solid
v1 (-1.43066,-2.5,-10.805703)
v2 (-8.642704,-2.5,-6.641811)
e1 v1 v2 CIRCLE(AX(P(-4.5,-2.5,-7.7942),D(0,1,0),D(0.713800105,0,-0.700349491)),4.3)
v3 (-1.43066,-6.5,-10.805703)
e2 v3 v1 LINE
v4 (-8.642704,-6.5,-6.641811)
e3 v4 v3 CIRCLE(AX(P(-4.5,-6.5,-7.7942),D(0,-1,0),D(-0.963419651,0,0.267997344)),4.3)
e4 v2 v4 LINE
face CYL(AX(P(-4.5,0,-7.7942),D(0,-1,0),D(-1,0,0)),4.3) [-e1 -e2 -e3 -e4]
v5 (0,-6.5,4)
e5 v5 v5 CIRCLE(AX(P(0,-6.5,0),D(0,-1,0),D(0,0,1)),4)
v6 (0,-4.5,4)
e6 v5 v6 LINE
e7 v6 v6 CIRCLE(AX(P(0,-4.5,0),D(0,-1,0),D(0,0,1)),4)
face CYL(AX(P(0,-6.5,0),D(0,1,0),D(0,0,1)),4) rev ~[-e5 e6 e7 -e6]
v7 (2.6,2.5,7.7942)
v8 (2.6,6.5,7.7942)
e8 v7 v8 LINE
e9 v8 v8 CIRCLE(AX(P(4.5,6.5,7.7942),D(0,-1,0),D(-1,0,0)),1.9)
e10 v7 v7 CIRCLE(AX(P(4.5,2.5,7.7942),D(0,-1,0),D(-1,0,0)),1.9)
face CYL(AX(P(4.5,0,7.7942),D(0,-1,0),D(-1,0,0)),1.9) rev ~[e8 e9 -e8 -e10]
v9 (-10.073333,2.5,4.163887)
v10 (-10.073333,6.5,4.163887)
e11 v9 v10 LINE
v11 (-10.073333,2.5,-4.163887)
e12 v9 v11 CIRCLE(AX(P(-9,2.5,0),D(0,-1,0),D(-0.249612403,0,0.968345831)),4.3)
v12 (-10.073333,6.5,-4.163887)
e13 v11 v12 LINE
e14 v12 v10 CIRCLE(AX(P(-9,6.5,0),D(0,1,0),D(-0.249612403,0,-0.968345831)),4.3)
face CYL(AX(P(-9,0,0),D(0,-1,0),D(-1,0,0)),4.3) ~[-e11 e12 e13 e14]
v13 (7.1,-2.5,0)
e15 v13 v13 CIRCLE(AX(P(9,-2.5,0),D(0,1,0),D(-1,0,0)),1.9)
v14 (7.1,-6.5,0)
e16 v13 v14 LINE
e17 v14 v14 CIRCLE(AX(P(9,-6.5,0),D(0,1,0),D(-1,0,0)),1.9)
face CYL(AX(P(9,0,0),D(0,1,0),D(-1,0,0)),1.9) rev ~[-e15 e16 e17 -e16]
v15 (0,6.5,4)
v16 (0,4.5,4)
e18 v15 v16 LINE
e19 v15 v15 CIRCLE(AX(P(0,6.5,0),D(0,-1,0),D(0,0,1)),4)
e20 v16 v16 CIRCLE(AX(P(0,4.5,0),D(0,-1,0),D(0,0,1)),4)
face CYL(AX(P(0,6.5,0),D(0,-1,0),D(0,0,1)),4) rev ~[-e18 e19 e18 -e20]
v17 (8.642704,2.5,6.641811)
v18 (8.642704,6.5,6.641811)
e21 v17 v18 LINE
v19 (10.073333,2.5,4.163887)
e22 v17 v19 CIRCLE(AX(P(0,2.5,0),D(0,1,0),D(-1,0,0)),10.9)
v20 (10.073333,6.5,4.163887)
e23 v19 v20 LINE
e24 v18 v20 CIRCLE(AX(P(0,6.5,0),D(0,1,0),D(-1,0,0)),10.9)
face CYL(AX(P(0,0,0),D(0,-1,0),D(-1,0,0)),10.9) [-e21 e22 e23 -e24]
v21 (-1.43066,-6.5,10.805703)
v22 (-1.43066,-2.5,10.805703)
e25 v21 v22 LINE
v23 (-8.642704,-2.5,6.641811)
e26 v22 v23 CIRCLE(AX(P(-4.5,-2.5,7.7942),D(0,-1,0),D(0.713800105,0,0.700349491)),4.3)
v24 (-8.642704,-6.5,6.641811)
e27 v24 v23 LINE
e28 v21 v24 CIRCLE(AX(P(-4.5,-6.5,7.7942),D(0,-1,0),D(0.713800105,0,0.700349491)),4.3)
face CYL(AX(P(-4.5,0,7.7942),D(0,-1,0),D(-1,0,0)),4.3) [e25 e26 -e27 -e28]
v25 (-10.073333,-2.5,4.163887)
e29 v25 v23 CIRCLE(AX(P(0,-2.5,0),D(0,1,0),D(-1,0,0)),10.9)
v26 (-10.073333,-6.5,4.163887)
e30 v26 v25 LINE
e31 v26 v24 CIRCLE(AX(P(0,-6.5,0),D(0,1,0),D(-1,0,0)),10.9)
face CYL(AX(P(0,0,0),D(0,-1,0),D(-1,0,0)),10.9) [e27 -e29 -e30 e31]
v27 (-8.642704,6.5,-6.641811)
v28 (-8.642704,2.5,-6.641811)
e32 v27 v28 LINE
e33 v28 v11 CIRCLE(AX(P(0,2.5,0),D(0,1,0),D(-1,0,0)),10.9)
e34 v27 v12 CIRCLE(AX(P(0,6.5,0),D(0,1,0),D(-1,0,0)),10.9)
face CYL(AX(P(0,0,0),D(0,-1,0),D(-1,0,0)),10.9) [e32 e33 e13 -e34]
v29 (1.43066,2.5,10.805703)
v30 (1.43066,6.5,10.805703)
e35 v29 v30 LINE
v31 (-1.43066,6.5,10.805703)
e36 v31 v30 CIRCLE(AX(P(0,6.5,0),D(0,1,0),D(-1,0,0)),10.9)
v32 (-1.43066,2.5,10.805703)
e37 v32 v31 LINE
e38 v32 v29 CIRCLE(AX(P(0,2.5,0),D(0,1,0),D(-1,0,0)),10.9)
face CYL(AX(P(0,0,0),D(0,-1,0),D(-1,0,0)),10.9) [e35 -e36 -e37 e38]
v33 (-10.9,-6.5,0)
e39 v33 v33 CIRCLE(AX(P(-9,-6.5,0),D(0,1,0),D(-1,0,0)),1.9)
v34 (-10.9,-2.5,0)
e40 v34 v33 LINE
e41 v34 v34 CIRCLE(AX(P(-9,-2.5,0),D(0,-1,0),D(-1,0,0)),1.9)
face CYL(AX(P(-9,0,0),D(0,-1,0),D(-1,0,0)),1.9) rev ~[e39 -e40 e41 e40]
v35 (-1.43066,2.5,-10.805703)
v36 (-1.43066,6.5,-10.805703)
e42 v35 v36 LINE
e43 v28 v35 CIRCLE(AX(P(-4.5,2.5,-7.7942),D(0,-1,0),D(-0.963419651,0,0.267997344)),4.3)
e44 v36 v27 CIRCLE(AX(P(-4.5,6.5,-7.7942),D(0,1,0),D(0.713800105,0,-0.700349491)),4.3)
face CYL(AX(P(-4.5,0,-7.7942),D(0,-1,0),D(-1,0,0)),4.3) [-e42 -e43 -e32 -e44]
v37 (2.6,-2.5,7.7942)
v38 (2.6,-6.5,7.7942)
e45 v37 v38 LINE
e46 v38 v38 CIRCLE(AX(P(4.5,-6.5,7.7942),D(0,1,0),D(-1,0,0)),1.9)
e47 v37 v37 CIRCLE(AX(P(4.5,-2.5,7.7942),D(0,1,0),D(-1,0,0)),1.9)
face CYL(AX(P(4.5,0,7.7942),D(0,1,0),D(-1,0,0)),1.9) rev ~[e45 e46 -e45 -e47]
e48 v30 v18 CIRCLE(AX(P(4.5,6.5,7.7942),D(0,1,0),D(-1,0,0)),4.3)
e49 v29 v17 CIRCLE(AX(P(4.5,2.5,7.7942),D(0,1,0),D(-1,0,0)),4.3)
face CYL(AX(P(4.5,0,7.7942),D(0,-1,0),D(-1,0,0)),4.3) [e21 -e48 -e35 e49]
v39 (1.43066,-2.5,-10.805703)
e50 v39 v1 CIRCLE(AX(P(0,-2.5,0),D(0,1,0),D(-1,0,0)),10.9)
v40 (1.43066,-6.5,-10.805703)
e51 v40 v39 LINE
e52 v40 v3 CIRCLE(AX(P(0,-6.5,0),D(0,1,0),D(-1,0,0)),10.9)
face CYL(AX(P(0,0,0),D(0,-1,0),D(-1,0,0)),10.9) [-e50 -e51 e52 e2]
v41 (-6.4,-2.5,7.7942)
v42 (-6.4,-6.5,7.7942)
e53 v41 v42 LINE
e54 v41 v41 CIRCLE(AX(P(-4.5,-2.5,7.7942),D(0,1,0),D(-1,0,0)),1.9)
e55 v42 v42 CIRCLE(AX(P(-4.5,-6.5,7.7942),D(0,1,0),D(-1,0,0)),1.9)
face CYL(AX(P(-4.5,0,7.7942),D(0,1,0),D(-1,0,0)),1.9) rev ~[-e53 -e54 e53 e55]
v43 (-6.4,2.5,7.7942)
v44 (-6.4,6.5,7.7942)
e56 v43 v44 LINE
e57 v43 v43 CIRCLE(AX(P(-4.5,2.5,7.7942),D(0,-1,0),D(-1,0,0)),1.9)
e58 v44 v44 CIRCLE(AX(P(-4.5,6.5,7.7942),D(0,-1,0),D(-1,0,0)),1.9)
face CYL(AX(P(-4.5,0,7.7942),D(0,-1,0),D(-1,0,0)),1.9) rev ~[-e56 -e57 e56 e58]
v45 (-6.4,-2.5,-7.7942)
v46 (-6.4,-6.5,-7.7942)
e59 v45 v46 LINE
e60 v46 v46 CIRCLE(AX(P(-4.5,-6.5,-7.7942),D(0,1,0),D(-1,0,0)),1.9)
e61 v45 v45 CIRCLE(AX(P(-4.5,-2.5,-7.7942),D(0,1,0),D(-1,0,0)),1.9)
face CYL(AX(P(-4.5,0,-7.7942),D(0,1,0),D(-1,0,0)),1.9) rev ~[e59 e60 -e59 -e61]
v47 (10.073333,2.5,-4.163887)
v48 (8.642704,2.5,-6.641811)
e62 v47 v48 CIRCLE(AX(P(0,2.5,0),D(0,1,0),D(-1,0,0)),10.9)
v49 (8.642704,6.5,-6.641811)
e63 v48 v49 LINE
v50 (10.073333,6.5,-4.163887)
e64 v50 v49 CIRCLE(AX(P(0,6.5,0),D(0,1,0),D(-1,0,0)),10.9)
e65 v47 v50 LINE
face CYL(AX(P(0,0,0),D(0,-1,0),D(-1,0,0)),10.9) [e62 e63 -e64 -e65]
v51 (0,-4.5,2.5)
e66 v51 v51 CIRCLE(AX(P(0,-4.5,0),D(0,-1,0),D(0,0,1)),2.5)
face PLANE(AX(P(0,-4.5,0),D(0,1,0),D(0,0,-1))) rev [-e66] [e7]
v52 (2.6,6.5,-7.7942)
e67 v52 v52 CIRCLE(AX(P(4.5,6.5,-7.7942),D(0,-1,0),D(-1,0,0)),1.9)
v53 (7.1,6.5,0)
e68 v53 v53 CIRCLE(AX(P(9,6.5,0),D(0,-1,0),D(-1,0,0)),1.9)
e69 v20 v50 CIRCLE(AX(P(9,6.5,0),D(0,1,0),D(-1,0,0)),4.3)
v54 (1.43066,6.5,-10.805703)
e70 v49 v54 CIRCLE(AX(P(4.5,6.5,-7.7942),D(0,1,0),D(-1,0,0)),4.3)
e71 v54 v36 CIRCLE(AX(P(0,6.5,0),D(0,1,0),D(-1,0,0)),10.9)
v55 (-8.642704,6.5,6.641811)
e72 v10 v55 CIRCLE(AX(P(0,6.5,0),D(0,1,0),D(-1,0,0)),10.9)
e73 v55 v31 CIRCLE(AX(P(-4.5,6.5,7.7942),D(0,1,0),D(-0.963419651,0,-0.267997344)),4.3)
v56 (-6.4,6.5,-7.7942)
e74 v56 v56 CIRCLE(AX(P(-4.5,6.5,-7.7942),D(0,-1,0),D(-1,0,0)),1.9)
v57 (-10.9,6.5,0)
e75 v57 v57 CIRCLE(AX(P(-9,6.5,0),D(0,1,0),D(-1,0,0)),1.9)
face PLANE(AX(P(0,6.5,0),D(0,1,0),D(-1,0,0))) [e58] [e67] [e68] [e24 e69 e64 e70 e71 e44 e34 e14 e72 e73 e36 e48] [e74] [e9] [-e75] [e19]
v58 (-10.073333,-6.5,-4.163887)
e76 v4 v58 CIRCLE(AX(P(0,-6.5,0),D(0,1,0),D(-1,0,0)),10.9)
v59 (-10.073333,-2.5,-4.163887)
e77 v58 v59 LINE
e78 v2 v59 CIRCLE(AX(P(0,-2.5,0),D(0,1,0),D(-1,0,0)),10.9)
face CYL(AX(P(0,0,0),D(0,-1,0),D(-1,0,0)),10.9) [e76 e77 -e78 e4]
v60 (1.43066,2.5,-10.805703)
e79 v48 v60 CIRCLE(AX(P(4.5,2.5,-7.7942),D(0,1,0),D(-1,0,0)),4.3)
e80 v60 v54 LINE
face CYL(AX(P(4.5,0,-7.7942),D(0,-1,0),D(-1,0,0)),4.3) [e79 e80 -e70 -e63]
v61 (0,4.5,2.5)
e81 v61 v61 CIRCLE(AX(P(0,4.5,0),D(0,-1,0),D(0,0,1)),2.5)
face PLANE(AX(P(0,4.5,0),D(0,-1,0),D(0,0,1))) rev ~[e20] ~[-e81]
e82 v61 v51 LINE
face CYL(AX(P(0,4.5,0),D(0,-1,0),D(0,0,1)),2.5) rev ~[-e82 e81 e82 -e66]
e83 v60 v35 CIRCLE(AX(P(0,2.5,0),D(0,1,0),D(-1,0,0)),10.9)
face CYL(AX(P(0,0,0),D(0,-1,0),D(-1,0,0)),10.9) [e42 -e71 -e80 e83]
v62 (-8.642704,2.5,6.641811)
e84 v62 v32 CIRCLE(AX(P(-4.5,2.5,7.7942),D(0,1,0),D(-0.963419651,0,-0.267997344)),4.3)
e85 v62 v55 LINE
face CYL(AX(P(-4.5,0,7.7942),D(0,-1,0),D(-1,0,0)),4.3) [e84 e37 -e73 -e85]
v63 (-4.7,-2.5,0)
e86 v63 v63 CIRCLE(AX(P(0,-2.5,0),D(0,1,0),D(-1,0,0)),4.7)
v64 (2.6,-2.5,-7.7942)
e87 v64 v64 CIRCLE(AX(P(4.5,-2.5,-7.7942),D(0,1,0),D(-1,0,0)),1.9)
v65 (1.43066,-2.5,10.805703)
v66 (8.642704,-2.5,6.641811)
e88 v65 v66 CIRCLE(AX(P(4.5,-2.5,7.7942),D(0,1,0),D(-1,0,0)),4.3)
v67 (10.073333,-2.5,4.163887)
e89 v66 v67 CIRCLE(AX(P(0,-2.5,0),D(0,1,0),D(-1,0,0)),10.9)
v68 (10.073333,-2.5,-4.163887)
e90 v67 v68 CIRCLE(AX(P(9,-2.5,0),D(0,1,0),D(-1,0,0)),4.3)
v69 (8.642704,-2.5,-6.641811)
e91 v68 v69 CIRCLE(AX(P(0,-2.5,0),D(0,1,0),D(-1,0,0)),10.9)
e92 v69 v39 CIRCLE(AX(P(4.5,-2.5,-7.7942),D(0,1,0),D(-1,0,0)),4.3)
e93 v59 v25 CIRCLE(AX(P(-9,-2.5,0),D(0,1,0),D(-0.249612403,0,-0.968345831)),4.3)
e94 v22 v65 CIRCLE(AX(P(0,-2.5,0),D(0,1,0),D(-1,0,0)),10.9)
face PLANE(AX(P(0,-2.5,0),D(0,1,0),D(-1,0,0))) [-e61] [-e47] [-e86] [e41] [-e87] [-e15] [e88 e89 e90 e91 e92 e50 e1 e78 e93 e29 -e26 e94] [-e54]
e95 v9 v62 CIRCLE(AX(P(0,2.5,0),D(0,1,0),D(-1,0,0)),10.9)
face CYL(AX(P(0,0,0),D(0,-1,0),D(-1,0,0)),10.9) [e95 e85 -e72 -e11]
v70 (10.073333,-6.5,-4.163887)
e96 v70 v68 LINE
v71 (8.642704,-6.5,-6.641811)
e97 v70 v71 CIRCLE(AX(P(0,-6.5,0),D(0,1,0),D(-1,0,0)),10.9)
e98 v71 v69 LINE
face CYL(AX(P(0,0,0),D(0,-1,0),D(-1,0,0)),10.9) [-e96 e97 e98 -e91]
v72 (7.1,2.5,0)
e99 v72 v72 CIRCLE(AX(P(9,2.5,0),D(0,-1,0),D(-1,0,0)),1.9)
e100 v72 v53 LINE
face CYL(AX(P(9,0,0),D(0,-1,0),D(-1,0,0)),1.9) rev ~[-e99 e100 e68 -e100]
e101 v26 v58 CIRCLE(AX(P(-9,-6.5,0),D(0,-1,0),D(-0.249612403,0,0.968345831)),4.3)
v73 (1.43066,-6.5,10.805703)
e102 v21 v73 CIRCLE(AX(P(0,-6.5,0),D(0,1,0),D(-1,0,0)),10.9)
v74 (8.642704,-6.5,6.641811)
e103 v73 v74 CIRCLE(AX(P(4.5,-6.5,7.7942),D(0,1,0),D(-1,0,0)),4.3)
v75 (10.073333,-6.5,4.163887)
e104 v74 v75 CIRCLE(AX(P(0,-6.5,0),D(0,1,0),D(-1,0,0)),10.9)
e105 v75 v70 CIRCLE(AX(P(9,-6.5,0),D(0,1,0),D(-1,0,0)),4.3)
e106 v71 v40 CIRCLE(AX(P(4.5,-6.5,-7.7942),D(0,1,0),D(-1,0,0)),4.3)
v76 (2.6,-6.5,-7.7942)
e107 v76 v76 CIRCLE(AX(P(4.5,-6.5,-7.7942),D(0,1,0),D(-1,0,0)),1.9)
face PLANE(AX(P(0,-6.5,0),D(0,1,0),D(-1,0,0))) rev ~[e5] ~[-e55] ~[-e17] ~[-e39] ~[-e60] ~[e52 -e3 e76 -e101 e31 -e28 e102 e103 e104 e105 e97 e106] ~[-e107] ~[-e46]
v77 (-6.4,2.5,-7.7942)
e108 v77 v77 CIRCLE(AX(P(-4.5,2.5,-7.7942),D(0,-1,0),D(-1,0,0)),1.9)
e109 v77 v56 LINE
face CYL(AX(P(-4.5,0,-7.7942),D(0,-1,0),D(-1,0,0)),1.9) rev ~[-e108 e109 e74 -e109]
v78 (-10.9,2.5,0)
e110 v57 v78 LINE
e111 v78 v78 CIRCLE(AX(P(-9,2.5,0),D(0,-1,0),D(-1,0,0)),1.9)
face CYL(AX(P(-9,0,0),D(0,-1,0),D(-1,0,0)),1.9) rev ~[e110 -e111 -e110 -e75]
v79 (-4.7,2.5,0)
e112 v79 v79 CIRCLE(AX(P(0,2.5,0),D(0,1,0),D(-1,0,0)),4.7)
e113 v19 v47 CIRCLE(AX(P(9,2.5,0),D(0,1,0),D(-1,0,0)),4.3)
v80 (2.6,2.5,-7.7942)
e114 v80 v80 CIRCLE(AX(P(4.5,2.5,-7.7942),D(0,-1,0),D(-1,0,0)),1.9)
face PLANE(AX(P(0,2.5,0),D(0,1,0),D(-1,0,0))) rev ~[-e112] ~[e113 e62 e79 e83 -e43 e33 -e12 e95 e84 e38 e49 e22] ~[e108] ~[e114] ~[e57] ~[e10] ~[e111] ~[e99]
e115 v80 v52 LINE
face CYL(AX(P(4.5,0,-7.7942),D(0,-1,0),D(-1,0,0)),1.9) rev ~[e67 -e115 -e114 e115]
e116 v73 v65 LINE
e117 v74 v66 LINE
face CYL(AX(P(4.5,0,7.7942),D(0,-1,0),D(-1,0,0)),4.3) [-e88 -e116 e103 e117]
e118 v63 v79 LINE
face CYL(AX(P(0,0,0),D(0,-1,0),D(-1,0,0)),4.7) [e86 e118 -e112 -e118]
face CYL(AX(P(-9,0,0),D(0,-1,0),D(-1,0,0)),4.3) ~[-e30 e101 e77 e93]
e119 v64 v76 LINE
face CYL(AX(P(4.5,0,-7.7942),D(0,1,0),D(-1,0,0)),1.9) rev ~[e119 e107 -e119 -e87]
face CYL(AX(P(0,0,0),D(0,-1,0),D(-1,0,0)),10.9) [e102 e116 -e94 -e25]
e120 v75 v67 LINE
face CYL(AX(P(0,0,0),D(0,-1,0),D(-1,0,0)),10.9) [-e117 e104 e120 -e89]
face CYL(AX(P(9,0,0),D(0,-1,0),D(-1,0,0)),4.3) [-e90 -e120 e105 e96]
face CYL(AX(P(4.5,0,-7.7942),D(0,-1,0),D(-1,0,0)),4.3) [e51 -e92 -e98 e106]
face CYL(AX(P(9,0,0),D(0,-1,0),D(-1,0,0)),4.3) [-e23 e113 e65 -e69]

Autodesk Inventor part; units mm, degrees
ref_plane "YZ Plane" through (0, 0, 0) normal (1, 0, 0) x (0, 1, 0)
ref_plane "XZ Plane" through (0, 0, 0) normal (0, 1, 0) x (-1, 0, 0)
ref_plane "XY Plane" through (0, 0, 0) normal (0, 0, 1) x (1, 0, 0)
sketch "Sketch1" plane through (0, 0, 0) normal (0, 1, 0) x (-1, 0, 0)
  circle A0 centre (9, 0) radius 1.9
  circle A1 centre (4.5, 7.7942) radius 1.9
  circle A2 centre (-4.5, 7.7942) radius 1.9
  circle A3 centre (-9, 0) radius 1.9
  circle A4 centre (-4.5, -7.7942) radius 1.9
  circle A5 centre (4.5, -7.7942) radius 1.9
  circle A6 centre (9, 0) radius 4.3
  circle A7 centre (4.5, 7.7942) radius 4.3
  circle A8 centre (-4.5, 7.7942) radius 4.3
  circle A9 centre (-9, 0) radius 4.3
  circle A10 centre (-4.5, -7.7942) radius 4.3
  circle A11 centre (4.5, -7.7942) radius 4.3
  circle A12 centre (0, 0) radius 10.9
  circle A13 centre (0, 0) radius 2.25
  circle A14 centre (0, 0) radius 4.7
  dimension "d0" = 3.8
  dimension "d1" = 9
  dimension "d4" = 360
  dimension "d6" = 2.4
  dimension "d9" = 360
  dimension "d13" = 4.5
  dimension "d30" = 8.6
extrude "Extrusion1" add sketch "Sketch1" along normal mid plane 13 contours A12 A6 | A12 A6 | A6 A14 A7 A12 | A12 A11 A14 A6 | A14 | A12 A7 | A7 A12 | A12 A11 | A11 A12 | A14 A8 A12 A7 | A11 A12 A10 A14 | A14 A9 A12 A8 | A8 A12 | A10 A12 | A10 A12 A9 A14 | A12 A8 | A9 A12 | A10 A12 | A12 A9 | A13
extrude "Extrusion2" cut sketch "Sketch1" along normal through all both and the other way through all contours A13
extrude "Extrusion3" cut sketch "Sketch1" along normal mid plane 5 contours A0 | A12 A6 | A12 A6 | A6 A14 A7 A12 | A12 A11 A14 A6 | A14 | A12 A7 | A1 | A7 A12 | A5 | A12 A11 | A11 A12 | A14 A8 A12 A7 | A11 A12 A10 A14 | A14 A9 A12 A8 | A2 | A8 A12 | A4 | A10 A12 | A10 A12 A9 A14 | A12 A8 | A3 | A9 A12 | A10 A12 | A12 A9
extrude "Extrusion4" add sketch "Sketch1" along normal through all both and the other way through all contours A14
hole "Hole1" at (0, 6.5, 0) direction (0, -1, 0) diameter 5 end through all counterbore diameter 8 counterbore depth 2
mirror "Mirror1" about plane through (0, 0, 0) normal (0, 1, 0) of "Hole1"
properties part number "piston-star-connector"
